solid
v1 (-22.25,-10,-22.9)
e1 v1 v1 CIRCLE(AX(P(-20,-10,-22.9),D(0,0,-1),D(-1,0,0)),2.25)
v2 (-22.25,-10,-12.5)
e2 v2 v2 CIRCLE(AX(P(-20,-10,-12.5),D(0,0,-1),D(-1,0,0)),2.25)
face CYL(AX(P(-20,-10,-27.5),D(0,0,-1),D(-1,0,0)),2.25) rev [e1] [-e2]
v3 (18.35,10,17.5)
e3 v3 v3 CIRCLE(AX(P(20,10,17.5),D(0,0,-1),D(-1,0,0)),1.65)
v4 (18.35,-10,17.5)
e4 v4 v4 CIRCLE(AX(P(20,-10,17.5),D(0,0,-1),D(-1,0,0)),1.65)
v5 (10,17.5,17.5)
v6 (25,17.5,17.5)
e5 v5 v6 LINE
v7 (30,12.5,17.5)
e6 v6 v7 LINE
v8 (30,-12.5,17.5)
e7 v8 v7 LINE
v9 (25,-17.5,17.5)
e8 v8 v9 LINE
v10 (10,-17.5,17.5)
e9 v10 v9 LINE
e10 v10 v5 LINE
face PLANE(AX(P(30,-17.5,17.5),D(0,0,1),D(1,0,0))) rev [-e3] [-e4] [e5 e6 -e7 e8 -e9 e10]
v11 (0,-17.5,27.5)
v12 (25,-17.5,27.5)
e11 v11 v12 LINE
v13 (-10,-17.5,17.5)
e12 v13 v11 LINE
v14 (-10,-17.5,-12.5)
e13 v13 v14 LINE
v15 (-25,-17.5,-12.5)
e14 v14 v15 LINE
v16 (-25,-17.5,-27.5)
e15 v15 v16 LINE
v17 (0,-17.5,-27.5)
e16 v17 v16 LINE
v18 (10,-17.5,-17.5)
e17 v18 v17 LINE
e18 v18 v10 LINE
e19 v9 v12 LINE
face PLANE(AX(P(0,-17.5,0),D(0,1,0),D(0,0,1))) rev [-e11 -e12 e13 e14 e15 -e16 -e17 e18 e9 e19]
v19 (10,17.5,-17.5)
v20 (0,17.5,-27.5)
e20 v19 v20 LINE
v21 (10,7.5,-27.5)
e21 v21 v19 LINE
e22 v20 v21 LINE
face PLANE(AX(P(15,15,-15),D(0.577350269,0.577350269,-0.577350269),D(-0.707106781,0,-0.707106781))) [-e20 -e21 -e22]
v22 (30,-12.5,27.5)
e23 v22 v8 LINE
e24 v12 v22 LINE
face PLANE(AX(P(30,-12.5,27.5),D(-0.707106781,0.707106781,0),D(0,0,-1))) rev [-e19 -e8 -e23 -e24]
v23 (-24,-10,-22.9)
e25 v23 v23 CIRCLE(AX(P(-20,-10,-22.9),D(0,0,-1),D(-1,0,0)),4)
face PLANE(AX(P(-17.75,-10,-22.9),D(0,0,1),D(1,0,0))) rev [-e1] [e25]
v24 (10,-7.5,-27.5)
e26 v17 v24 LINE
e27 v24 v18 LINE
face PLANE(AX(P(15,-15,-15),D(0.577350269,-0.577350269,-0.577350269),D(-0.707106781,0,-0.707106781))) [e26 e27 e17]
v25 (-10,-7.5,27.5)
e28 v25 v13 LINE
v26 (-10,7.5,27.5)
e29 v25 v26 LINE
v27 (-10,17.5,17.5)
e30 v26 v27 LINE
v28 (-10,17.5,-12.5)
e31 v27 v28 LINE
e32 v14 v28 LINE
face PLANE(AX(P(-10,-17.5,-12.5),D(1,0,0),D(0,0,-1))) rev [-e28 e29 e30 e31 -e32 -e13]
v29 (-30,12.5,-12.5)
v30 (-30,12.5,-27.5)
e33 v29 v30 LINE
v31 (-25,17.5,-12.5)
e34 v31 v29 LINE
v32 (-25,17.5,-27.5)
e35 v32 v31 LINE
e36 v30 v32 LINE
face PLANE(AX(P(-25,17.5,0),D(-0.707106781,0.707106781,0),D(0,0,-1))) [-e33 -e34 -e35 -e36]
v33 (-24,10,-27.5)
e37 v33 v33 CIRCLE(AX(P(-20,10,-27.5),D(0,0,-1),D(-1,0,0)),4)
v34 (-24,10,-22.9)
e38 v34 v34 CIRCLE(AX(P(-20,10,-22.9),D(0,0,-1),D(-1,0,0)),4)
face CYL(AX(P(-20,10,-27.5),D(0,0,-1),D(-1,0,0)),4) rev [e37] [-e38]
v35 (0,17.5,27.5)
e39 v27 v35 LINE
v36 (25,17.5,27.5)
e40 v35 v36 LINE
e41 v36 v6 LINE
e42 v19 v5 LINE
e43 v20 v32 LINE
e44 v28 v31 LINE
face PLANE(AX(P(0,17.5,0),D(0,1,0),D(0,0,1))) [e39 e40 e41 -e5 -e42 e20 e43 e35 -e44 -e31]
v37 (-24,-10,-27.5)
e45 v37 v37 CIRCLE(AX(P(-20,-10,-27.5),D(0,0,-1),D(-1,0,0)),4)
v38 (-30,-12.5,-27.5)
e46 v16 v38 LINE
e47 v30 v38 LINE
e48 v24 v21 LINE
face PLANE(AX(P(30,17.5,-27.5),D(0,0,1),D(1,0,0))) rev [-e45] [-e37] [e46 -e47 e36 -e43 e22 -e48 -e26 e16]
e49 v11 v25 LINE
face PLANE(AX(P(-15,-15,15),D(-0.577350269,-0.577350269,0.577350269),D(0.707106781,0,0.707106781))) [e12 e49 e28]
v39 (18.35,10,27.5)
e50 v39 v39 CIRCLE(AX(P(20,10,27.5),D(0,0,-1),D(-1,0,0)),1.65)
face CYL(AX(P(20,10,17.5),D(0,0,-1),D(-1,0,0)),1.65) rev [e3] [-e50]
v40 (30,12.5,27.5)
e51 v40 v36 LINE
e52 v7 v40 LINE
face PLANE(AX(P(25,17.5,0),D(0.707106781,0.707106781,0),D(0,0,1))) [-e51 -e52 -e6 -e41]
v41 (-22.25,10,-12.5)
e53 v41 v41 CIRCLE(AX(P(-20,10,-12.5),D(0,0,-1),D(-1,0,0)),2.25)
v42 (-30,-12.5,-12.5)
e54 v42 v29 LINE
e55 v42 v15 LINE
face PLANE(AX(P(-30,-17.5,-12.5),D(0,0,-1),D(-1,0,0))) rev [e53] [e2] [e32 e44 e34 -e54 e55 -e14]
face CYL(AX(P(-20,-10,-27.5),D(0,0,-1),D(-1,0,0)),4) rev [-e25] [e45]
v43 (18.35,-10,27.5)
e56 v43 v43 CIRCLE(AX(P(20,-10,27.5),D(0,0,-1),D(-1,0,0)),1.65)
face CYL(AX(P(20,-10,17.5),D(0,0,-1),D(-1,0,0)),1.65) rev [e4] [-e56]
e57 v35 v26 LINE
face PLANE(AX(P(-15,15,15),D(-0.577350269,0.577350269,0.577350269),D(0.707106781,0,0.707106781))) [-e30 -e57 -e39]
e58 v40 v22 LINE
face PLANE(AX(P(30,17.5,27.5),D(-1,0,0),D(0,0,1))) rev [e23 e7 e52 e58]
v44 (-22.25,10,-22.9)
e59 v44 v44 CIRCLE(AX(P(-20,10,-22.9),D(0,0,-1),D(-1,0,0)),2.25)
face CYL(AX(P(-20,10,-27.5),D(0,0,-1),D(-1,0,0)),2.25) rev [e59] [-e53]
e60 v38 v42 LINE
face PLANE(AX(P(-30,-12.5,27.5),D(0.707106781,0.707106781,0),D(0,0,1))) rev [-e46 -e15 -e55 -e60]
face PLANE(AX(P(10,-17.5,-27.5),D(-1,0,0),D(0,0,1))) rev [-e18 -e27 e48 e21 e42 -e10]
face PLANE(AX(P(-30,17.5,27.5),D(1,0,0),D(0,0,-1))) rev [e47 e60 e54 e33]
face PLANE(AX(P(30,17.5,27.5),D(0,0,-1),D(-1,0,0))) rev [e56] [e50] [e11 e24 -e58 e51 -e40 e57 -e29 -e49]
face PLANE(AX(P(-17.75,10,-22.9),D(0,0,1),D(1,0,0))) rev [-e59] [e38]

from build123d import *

# Parameters (mm, degrees)
SKETCH1_W                                            = 60
SKETCH1_H                                            = 55
BOSS_EXTRUDE1_DEPTH                                  = 17.5
SKETCH2_W                                            = 20
SKETCH2_H                                            = 45
SKETCH2_H_2                                          = 40
CUT_EXTRUDE1_DEPTH                                   = 54.677276384
M4_TAPPED_HOLE1_D                                    = 3.3
CBORE_FOR_M4_HEXAGON_SOCKET_HEAD_CAP_SCR_D           = 4.5
CBORE_FOR_M4_HEXAGON_SOCKET_HEAD_CAP_SCR_CBORE_D     = 8
CBORE_FOR_M4_HEXAGON_SOCKET_HEAD_CAP_SCR_CBORE_DEPTH = 4.6
CHAMFER1_SIZE                                        = 5
CHAMFER2_START                                       = 25.980762114
CHAMFER2_OUTLINE_W                                   = 15
CHAMFER2_OUTLINE_H                                   = 17
CHAMFER2_DEPTH                                       = 7.019237886
CHAMFER3_START                                       = -33
CHAMFER3_OUTLINE_W                                   = 15
CHAMFER3_OUTLINE_H                                   = 17
CHAMFER3_DEPTH                                       = 7.019237886


with BuildPart() as part:
    # Sketch1 → Boss-Extrude1 (new, symmetric)
    with BuildSketch(Plane(origin=(0, 0, 0), x_dir=(1, 0, 0), z_dir=(0, 1, 0))):
        Rectangle(SKETCH1_W, SKETCH1_H)
    extrude(amount=BOSS_EXTRUDE1_DEPTH, both=True)

    # Sketch2 → Cut-Extrude1 (cut, through all)
    with BuildSketch(Plane(origin=(0, 17.5, 0), x_dir=(1, 0, 0), z_dir=(0, 1, 0))):
        with Locations((20, 5)):
            Rectangle(SKETCH2_W, SKETCH2_H)
        with Locations((-20, -7.5)):
            Rectangle(SKETCH2_W, SKETCH2_H_2)
    extrude(amount=-CUT_EXTRUDE1_DEPTH, mode=Mode.SUBTRACT)

    # M4 Tapped Hole1 (through all)
    with Locations(Plane(origin=(0, 0, 17.5), x_dir=(-1, 0, 0), z_dir=(0, 0, -1))):
        with Locations((-20, 10), (-20, -10)):
            Hole(M4_TAPPED_HOLE1_D / 2)

    # CBORE for M4 Hexagon socket head cap screws1 (through all)
    with Locations(Plane(origin=(0, 0, -27.5), x_dir=(-1, 0, 0), z_dir=(0, 0, -1))):
        with Locations((20, 10), (20, -10)):
            CounterBoreHole(CBORE_FOR_M4_HEXAGON_SOCKET_HEAD_CAP_SCR_D / 2, CBORE_FOR_M4_HEXAGON_SOCKET_HEAD_CAP_SCR_CBORE_D / 2, CBORE_FOR_M4_HEXAGON_SOCKET_HEAD_CAP_SCR_CBORE_DEPTH)

    # Chamfer1
    chamfer1_edges = [part.edges().sort_by_distance(p)[0] for p in [
        (30, 17.5, 22.5),
        (-30, 17.5, -20),
        (30, -17.5, 22.5),
        (-30, -17.5, -20),
    ]]
    chamfer(chamfer1_edges, length=CHAMFER1_SIZE)

    # Chamfer2: read off the stored shape, not the designer's step
    # Chamfer2 outline → Chamfer2 (cut)
    with BuildSketch(Plane(origin=(0, 0, 0), x_dir=(0.8164965809277258, 0.40824829046386313, 0.40824829046386313), z_dir=(0.5773502691896258, -0.5773502691896258, -0.5773502691896258)).offset(CHAMFER2_START)):
        with Locations((-12.5, -7.5)):
            Rectangle(CHAMFER2_OUTLINE_W, CHAMFER2_OUTLINE_H)
    chamfer2 = extrude(amount=CHAMFER2_DEPTH, mode=Mode.SUBTRACT)

    # Chamfer3: read off the stored shape, not the designer's step
    # Chamfer3 outline → Chamfer3 (cut)
    with BuildSketch(Plane(origin=(0, 0, 0), x_dir=(0.8164965809277258, -0.40824829046386313, 0.40824829046386313), z_dir=(0.5773502691896258, 0.5773502691896258, -0.5773502691896258)).offset(CHAMFER3_START)):
        with Locations((12.5, -7.5)):
            Rectangle(CHAMFER3_OUTLINE_W, CHAMFER3_OUTLINE_H)
    chamfer3 = extrude(amount=CHAMFER3_DEPTH, mode=Mode.SUBTRACT)

    # Mirror1: Chamfer2, Chamfer3 across plane
    add(chamfer2.mirror(Plane.ZX), mode=Mode.SUBTRACT)
    add(chamfer3.mirror(Plane.ZX), mode=Mode.SUBTRACT)


solid = part.part
